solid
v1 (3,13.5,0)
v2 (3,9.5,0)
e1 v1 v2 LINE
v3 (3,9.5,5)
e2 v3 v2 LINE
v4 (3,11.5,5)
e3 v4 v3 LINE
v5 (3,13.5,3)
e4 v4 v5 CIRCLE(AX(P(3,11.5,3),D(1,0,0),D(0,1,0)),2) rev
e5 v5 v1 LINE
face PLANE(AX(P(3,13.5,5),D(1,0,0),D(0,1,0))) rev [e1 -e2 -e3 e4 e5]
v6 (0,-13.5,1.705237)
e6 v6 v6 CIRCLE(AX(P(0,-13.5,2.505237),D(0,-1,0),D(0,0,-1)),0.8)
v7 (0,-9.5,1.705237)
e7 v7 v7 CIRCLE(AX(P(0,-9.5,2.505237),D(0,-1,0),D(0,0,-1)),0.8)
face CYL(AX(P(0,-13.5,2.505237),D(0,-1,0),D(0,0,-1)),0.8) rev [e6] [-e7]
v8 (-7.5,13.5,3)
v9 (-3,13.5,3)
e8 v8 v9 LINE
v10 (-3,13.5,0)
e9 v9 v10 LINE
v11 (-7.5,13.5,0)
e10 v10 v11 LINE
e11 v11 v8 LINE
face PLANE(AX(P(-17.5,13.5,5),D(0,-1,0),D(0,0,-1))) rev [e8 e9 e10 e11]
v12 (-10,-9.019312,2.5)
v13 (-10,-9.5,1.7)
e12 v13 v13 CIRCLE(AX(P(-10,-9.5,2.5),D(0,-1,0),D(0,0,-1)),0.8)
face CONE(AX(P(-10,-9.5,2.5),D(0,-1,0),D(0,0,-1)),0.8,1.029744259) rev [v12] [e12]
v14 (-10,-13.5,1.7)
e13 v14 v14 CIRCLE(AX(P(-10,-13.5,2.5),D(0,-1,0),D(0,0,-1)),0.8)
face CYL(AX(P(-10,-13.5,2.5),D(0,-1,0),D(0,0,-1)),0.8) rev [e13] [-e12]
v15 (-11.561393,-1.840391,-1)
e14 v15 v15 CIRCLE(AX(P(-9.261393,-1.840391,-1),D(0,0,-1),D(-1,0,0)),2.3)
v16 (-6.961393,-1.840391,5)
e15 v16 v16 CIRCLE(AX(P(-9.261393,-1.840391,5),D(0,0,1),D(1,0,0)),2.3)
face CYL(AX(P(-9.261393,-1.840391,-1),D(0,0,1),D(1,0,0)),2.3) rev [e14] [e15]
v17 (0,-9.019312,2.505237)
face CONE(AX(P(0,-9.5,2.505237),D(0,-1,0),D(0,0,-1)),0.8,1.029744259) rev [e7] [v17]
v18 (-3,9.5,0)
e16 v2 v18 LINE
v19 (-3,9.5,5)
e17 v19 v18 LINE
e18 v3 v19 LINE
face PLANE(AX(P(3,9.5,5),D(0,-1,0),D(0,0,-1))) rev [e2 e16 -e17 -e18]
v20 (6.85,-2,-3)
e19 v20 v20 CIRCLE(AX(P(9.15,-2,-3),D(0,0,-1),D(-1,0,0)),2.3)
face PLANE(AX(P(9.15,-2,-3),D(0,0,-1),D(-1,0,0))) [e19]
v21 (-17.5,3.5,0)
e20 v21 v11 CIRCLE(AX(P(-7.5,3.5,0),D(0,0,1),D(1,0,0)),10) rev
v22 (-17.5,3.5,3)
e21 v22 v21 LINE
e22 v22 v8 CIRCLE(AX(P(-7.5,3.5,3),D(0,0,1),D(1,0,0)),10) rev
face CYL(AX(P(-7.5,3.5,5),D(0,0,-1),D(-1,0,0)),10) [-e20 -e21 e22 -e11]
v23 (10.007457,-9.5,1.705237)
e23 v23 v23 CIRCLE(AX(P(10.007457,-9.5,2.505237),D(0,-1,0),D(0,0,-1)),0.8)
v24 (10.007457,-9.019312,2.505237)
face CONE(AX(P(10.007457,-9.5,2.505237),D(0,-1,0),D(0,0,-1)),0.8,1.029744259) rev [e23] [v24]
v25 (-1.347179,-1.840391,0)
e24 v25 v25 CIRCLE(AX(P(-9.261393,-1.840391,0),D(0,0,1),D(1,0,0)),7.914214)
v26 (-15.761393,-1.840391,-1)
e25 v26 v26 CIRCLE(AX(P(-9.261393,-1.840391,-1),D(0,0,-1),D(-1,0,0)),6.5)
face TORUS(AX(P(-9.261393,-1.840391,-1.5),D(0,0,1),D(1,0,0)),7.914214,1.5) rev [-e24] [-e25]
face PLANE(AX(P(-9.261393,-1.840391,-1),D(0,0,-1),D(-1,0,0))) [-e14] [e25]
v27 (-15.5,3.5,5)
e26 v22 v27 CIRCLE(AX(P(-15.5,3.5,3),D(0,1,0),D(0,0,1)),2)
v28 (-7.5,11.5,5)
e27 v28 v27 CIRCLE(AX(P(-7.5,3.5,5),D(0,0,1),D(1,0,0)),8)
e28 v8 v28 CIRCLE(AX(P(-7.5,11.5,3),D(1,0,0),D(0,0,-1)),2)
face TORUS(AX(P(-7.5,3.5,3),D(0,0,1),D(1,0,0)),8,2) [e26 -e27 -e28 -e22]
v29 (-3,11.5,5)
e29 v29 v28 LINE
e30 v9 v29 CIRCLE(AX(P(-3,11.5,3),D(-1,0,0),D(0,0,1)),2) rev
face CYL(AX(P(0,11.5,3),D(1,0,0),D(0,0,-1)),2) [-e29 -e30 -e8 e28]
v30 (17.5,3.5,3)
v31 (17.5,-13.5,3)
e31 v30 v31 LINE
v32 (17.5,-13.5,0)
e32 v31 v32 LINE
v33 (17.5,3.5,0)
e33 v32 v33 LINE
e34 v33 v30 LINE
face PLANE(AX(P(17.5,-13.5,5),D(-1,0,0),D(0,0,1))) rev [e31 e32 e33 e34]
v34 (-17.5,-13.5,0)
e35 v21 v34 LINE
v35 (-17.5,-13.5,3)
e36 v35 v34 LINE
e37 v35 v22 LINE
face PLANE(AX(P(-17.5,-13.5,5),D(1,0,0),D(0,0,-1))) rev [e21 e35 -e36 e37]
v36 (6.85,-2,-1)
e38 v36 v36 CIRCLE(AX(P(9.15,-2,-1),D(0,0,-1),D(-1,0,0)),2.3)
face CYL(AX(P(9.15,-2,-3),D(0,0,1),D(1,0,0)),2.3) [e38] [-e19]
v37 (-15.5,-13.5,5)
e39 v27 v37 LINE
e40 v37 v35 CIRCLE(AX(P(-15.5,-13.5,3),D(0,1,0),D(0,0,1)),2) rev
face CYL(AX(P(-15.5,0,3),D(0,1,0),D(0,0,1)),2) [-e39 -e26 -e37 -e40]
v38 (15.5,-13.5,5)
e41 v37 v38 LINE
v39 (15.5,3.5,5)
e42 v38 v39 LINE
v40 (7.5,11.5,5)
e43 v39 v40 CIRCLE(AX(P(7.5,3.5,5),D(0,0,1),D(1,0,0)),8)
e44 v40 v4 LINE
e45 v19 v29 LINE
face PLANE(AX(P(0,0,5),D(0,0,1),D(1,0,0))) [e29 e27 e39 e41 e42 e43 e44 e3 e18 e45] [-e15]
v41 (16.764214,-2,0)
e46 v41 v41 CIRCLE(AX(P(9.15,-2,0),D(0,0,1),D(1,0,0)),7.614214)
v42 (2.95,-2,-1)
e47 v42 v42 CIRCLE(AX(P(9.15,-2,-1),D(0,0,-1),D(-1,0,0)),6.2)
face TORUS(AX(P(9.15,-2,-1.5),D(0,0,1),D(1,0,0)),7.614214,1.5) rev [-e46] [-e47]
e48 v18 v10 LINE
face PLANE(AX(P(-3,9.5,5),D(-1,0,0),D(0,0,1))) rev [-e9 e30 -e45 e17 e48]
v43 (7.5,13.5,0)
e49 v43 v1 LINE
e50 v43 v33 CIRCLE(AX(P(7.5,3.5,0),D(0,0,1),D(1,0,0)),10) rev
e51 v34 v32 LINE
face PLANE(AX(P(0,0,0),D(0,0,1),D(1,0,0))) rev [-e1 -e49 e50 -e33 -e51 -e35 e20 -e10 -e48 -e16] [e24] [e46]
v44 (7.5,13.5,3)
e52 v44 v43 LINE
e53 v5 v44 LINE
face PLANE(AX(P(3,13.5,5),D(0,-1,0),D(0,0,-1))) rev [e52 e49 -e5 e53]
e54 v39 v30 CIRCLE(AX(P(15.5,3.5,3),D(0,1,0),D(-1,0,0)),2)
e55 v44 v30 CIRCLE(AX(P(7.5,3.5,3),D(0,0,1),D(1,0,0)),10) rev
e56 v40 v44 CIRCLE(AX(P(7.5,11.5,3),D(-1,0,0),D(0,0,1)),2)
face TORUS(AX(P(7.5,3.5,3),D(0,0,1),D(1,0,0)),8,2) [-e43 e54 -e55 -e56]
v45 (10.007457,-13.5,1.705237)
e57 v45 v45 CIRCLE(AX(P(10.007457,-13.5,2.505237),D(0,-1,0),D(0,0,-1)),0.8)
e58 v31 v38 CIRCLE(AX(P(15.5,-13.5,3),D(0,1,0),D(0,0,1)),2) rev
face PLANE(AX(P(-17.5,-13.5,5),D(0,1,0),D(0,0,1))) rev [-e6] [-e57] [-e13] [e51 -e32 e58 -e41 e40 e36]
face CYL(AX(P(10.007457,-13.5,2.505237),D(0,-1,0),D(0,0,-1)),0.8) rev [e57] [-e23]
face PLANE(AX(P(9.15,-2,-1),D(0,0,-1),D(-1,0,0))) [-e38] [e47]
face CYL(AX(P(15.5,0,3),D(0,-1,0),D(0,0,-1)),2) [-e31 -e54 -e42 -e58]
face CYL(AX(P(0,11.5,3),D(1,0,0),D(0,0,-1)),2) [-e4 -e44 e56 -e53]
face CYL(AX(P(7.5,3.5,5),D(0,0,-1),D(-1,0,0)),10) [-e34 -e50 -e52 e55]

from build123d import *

# Parameters (mm, degrees)
BOSS_EXTRUDE1_DEPTH              = 5
FILLET1_R                        = 10
FILLET2_R                        = 2
SKETCH2_R                        = 6.5
SKETCH2_R_2                      = 2.3
SKETCH2_R_3                      = 6.2
BOSS_EXTRUDE2_DEPTH              = 1
FILLET3_R                        = 1.5
TAP_DRILL_SLOT_FOR_M2_TAP1_D     = 1.6
TAP_DRILL_SLOT_FOR_M2_TAP1_DEPTH = 4
TAP_DRILL_SLOT_FOR_M2_TAP1_TIP   = 0.480688495
SKETCH3_R                        = 2.3
BOSS_EXTRUDE3_DEPTH              = 2
SKETCH8_R                        = 2.3
CUT_EXTRUDE1_DEPTH               = 10


with BuildPart() as part:
    # Sketch1 → Boss-Extrude1 (new body)
    with BuildSketch(Plane.XY):
        Polygon((3, 13.5), (3, 9.5), (-3, 9.5), (-3, 13.5), (-17.5, 13.5), (-17.5, -13.5), (17.5, -13.5), (17.5, 13.5), align=None)
    extrude(amount=BOSS_EXTRUDE1_DEPTH)

    # Fillet1
    fillet1_edges = [part.edges().sort_by_distance(p)[0] for p in [
        (17.5, 13.5, 2.5),
        (-17.5, 13.5, 2.5),
    ]]
    fillet(fillet1_edges, radius=FILLET1_R)

    # Fillet2
    fillet2_edges = [part.edges().sort_by_distance(p)[0] for p in [
        (-5.25, 13.5, 5),
        (-17.5, -5, 5),
        (17.5, -5, 5),
        (5.25, 13.5, 5),
        (14.571067812, 10.571067812, 5),
        (-14.571067812, 10.571067812, 5),
    ]]
    fillet(fillet2_edges, radius=FILLET2_R)

    # Sketch2 → Boss-Extrude2 (add)
    # profile 1 of 2: a face of its own
    with BuildSketch(Plane(origin=(0, 0, 0), x_dir=(-1, 0, 0), z_dir=(0, 0, -1))):
        with Locations(Location((9.261392854, -1.840391381, 0), (0, 0, 180))):
            Circle(SKETCH2_R)
        with Locations((9.261392854, -1.840391381)):
            Circle(SKETCH2_R_2, mode=Mode.SUBTRACT)
    # profile 2 of 2: a face of its own
    with BuildSketch(Plane(origin=(0, 0, 0), x_dir=(-1, 0, 0), z_dir=(0, 0, -1))):
        with Locations(Location((-9.15, -2, 0), (0, 0, 180))):
            Circle(SKETCH2_R_3)
    extrude(amount=BOSS_EXTRUDE2_DEPTH)

    # Fillet3
    # the kernel refuses this fillet: 1.5 mm, written as the material it adds along each edge
    with BuildSketch(Plane(origin=(-9.261392854, -1.840391381, 0), x_dir=(1, 0, 0), z_dir=(0, 1, 0))) as fillet3_piece_1:
        with BuildLine():
            CenterArc((7.914213562, 1.5), FILLET3_R, 199.471220634, 70.528779366)
            Line((6.5, 1), (6.471715729, 0.99))
            ThreePointArc((6.471715729, 0.99), (6.47, 0.5), (6.47, 0))
            Line((6.47, 0), (6.5, -0.03))
            Line((6.5, -0.03), (7.914213562, -0.03))
            Line((7.914213562, -0.03), (7.914213562, 0))
        make_face()
    revolve(axis=Axis((-9.261392854, -1.840391381, 0), (0, 0, -1)))
    with BuildSketch(Plane(origin=(9.15, -2, 0), x_dir=(1, 0, 0), z_dir=(0, 1, 0))) as fillet3_piece_2:
        with BuildLine():
            CenterArc((7.614213562, 1.5), FILLET3_R, 199.471220634, 70.528779366)
            Line((6.2, 1), (6.171715729, 0.99))
            ThreePointArc((6.171715729, 0.99), (6.17, 0.5), (6.17, 0))
            Line((6.17, 0), (6.2, -0.03))
            Line((6.2, -0.03), (7.614213562, -0.03))
            Line((7.614213562, -0.03), (7.614213562, 0))
        make_face()
    revolve(axis=Axis((9.15, -2, 0), (0, 0, -1)))

    # Tap Drill Slot for M2 Tap1
    with Locations(Plane(origin=(0, -13.5, 0), x_dir=(-1, 0, 0), z_dir=(0, -1, 0))):
        with Locations((-10.007456689, -2.505236507), (0, -2.505236507), (10, -2.5)):
            Hole(TAP_DRILL_SLOT_FOR_M2_TAP1_D / 2, depth=TAP_DRILL_SLOT_FOR_M2_TAP1_DEPTH)
            with Locations((0, 0, -(TAP_DRILL_SLOT_FOR_M2_TAP1_DEPTH + TAP_DRILL_SLOT_FOR_M2_TAP1_TIP / 2))):  # 118° drill point
                Cone(0, TAP_DRILL_SLOT_FOR_M2_TAP1_D / 2, TAP_DRILL_SLOT_FOR_M2_TAP1_TIP, mode=Mode.SUBTRACT)

    # Sketch3 → Boss-Extrude3 (add)
    with BuildSketch(Plane(origin=(0, 0, -1), x_dir=(-1, 0, 0), z_dir=(0, 0, -1))):
        with Locations((-9.15, -2)):
            Circle(SKETCH3_R)
    extrude(amount=BOSS_EXTRUDE3_DEPTH)

    # Sketch8 → Cut-Extrude1 (cut)
    with BuildSketch(Plane.XY.offset(5)):
        with Locations((-9.261392854, -1.840391381)):
            Circle(SKETCH8_R)
    extrude(amount=-CUT_EXTRUDE1_DEPTH, mode=Mode.SUBTRACT)


solid = part.part
